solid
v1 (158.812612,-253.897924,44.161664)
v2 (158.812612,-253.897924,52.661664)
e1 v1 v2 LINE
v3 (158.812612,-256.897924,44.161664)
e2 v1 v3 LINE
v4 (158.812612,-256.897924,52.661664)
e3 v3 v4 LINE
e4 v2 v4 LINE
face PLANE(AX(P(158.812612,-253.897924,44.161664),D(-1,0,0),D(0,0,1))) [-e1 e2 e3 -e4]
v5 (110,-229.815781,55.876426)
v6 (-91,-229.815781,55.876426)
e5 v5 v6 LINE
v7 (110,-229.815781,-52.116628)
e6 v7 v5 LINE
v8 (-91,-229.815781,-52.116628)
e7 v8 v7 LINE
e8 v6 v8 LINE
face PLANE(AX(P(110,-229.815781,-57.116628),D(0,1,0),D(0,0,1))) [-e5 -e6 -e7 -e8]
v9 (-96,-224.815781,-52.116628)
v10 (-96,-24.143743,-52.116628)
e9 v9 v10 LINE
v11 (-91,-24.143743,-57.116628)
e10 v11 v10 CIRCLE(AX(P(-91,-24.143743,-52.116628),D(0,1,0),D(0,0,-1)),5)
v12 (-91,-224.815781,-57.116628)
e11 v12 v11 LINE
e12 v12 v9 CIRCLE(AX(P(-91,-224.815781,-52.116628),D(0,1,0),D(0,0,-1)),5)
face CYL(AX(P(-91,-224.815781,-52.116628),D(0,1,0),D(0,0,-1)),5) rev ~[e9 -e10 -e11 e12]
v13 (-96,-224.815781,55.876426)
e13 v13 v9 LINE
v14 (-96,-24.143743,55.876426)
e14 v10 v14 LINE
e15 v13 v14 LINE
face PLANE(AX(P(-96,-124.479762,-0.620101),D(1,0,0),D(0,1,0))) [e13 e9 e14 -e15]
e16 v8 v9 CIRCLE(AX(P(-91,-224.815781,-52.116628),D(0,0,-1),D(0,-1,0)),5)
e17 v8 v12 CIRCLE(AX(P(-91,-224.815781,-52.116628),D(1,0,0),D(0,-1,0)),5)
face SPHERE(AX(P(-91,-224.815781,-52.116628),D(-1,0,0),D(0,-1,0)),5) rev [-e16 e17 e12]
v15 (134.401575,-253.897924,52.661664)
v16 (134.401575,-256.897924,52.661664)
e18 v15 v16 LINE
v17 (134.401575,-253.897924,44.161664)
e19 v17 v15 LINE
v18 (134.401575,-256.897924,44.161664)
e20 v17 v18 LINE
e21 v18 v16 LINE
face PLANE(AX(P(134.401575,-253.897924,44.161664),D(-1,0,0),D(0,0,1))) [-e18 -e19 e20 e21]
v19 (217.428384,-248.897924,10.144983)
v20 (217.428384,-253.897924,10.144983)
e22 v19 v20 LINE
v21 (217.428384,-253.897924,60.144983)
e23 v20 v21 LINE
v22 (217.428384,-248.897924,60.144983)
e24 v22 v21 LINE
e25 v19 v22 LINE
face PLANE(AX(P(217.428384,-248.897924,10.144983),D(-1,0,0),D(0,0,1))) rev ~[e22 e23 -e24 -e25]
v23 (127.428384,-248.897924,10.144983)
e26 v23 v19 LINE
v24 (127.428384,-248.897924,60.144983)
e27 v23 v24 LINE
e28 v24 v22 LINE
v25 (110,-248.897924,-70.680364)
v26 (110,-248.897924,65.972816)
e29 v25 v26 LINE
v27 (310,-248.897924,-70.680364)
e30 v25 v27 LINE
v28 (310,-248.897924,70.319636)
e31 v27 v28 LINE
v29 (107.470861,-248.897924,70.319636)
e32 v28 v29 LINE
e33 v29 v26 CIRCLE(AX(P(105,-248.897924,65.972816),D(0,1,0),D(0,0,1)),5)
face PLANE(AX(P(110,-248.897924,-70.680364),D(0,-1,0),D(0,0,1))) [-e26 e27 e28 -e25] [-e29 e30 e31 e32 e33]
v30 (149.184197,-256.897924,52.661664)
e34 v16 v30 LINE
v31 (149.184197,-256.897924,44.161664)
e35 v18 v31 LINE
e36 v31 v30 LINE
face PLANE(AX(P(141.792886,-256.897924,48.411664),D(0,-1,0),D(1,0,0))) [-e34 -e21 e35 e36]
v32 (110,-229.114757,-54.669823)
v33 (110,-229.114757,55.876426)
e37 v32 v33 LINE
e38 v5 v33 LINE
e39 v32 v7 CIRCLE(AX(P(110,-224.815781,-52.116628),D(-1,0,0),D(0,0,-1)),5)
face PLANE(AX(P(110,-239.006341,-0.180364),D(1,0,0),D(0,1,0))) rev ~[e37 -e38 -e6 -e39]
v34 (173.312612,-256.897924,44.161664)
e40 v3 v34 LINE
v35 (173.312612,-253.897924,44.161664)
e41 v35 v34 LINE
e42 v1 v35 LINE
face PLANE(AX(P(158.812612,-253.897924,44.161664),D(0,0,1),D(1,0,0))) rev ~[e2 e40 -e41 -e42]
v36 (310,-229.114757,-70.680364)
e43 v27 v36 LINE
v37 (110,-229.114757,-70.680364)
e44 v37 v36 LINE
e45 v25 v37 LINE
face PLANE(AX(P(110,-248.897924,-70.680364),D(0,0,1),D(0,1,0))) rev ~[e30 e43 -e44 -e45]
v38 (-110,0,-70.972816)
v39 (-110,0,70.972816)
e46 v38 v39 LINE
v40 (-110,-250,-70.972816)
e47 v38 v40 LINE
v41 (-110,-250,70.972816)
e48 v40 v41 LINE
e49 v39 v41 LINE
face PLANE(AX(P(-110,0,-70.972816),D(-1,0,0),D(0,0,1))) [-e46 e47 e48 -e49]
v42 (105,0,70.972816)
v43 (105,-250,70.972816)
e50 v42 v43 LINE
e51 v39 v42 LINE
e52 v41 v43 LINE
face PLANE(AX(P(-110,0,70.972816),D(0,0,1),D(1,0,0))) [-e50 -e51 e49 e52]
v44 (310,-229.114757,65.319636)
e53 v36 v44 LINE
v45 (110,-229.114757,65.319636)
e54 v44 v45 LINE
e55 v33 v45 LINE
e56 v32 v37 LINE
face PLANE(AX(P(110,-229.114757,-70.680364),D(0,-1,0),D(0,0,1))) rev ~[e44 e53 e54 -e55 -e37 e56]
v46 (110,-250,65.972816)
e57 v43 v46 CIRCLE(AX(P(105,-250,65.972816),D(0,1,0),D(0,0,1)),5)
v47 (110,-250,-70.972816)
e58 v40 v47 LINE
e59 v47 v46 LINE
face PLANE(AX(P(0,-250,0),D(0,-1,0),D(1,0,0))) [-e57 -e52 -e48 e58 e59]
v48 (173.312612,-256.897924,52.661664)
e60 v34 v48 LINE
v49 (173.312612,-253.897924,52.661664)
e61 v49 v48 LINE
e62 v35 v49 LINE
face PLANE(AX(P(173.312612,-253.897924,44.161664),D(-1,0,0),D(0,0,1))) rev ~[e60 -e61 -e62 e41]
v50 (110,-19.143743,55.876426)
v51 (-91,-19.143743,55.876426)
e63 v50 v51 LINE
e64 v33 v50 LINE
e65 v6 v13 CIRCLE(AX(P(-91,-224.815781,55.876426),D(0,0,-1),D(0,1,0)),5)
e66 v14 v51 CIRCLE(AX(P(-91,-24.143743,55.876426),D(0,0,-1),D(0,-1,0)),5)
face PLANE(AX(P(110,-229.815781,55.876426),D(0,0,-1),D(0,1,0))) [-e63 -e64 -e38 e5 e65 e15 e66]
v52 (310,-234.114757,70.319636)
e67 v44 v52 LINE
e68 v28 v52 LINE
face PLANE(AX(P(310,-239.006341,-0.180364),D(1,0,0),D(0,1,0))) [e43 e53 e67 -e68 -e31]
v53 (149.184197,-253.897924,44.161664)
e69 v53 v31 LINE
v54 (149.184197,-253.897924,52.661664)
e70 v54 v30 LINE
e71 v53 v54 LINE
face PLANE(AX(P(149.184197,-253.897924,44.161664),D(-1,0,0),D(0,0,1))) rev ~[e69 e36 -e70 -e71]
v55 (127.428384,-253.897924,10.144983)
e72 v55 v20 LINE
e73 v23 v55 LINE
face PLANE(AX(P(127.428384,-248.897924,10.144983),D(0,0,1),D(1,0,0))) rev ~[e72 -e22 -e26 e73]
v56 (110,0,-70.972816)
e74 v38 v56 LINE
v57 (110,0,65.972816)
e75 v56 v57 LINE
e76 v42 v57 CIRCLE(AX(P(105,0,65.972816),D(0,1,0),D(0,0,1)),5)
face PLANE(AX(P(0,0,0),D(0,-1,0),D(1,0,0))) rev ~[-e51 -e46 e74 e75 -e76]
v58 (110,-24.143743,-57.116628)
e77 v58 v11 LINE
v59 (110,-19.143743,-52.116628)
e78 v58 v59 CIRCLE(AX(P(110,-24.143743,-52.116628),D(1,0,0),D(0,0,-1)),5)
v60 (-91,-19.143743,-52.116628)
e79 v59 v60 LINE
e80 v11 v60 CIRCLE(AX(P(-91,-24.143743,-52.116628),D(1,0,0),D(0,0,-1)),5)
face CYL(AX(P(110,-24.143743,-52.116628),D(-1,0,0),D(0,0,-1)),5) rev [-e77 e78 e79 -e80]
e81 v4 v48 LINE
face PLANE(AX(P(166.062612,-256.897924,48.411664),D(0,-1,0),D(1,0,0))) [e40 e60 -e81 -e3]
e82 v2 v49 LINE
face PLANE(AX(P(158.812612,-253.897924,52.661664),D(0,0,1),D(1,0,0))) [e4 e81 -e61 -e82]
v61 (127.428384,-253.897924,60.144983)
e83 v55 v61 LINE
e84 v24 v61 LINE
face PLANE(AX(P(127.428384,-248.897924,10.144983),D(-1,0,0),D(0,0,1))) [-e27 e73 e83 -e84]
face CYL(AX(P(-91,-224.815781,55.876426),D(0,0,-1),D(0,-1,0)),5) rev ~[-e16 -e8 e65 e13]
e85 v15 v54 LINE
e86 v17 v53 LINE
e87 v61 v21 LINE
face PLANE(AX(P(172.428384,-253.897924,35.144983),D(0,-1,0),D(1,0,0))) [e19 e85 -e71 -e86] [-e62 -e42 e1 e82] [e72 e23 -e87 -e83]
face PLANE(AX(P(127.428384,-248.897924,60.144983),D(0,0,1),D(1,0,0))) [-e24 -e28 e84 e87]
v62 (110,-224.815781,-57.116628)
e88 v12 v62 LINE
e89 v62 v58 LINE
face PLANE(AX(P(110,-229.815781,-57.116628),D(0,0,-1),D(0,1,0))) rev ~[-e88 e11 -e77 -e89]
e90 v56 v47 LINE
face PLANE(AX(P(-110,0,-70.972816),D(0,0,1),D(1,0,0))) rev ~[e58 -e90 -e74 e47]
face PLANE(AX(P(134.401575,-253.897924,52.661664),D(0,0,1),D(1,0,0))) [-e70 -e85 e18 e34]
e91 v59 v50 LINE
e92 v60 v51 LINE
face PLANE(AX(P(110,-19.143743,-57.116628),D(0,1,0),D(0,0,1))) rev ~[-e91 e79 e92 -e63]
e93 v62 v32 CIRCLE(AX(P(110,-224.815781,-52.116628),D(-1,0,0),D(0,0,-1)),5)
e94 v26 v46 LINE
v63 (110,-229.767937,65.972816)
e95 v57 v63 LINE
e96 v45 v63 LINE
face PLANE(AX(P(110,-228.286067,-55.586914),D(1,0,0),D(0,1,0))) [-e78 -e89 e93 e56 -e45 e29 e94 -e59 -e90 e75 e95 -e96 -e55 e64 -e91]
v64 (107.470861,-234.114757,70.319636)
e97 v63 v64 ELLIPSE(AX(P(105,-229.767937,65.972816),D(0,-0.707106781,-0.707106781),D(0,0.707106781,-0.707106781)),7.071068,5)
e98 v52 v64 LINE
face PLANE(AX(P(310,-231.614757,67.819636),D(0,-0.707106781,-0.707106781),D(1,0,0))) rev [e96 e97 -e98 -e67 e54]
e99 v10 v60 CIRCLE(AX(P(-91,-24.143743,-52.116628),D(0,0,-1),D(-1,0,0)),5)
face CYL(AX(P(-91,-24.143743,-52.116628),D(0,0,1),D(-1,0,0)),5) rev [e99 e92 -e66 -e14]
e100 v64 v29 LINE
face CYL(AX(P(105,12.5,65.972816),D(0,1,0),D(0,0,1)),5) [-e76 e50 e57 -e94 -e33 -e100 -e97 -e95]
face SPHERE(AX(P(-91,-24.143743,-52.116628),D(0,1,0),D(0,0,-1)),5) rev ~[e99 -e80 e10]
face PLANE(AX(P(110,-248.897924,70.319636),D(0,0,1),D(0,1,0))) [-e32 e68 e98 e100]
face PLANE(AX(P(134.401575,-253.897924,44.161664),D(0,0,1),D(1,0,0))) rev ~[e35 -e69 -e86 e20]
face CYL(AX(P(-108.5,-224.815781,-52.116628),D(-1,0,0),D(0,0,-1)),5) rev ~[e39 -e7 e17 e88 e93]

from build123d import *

# Parameters (mm, degrees)
F0_W         = 220
F0_H         = 141.9456327772
F1_DEPTH     = 250
F3_W         = 210.672037676
F3_H         = 112.9930540919
F4_DEPTH     = 206
F5_W         = 19.7831674727
F5_H         = 141
F6_DEPTH     = 200
F7_T4_DEPTH  = 275
F7_T10_DEPTH = 275
F7_T16_DEPTH = 275
F7_T23_DEPTH = 275
F7_T29_DEPTH = 275
F8_SIZE      = 5
F9_T1_DEPTH  = 218.5
F10_R        = 5
F11_R        = 5
F12_W        = 90
F12_H        = 50
F13_DEPTH    = 5
F14_W        = 14.7826219899
F14_H        = 8.5
F15_DEPTH    = 3
F16_W        = 14.5
F16_H        = 8.5
F17_DEPTH    = 3


# Not quite as in the source:
# - a fillet or chamfer that OpenCascade refuses, or shapes differently, is made with other operations: its cross-section is extruded or revolved along the edge and cut away or added


with BuildPart() as f1:
    # F0 (on Front) → F1 (new body)
    with BuildSketch(Plane.XZ):
        Rectangle(F0_W, F0_H)
    extrude(amount=F1_DEPTH)

    # F3 (on face) → F4 (cut)
    with BuildSketch(Plane.YZ.offset(110)):
        with Locations((-124.4797622785, -0.6201006472)):
            Rectangle(F3_W, F3_H)
    extrude(amount=-F4_DEPTH, mode=Mode.SUBTRACT)

    # F5 (on face) → F6 (join)
    with BuildSketch(Plane.YZ.offset(110)):
        with Locations((-239.0063405037, -0.1803636551)):
            Rectangle(F5_W, F5_H)
    extrude(amount=F6_DEPTH)

    # F7: fillet of radius 5 on 1 edges, made by hand


with BuildPart() as f7_tool2:
    # F7_s3 → F7_t4 (new body)
    with BuildSketch(Plane.XZ.offset(-12.5)):
        with BuildLine():
            ThreePointArc((105, 70.9728163886), (108.5355339059, 69.5083502945), (110, 65.9728163886))
            Line((110, 65.9728163886), (110, 70.9728163886))
            Line((110, 70.9728163886), (105, 70.9728163886))
        make_face()
    extrude(amount=F7_T4_DEPTH)

    split(bisect_by=Plane.XY.offset(70.3196363449), keep=Keep.TOP)

    split(bisect_by=Plane.XZ.offset(229.1147567674), keep=Keep.BOTTOM)


with BuildPart() as f1_1:
    add(f1.part)

    # F7_t1: cut F7_tool2
    add(f7_tool2.part, mode=Mode.SUBTRACT)


with BuildPart() as f7_tool8:
    # F7_s9 → F7_t10 (new body)
    with BuildSketch(Plane.XZ.offset(-12.5)):
        with BuildLine():
            ThreePointArc((105, 70.9728163886), (108.5355339059, 69.5083502945), (110, 65.9728163886))
            Line((110, 65.9728163886), (110, 70.9728163886))
            Line((110, 70.9728163886), (105, 70.9728163886))
        make_face()
    extrude(amount=F7_T10_DEPTH)

    split(bisect_by=Plane.XY.offset(70.3196363449), keep=Keep.BOTTOM)

    split(bisect_by=Plane.XZ.offset(229.1147567674), keep=Keep.BOTTOM)


with BuildPart() as f1_2:
    add(f1_1.part)

    # F7_t7: cut F7_tool8
    add(f7_tool8.part, mode=Mode.SUBTRACT)


with BuildPart() as f7_tool14:
    # F7_s15 → F7_t16 (new body)
    with BuildSketch(Plane.XZ.offset(-12.5)):
        with BuildLine():
            ThreePointArc((105, 70.9728163886), (108.5355339059, 69.5083502945), (110, 65.9728163886))
            Line((110, 65.9728163886), (110, 70.9728163886))
            Line((110, 70.9728163886), (105, 70.9728163886))
        make_face()
    extrude(amount=F7_T16_DEPTH)

    split(bisect_by=Plane.XZ.offset(248.89792424), keep=Keep.BOTTOM)

    split(bisect_by=Plane.XY.offset(70.3196363449), keep=Keep.TOP)

    split(bisect_by=Plane.XZ.offset(229.1147567674), keep=Keep.TOP)


with BuildPart() as f1_3:
    add(f1_2.part)

    # F7_t13: cut F7_tool14
    add(f7_tool14.part, mode=Mode.SUBTRACT)


with BuildPart() as f7_tool21:
    # F7_s22 → F7_t23 (new body)
    with BuildSketch(Plane.XZ.offset(-12.5)):
        with BuildLine():
            ThreePointArc((105, 70.9728163886), (108.5355339059, 69.5083502945), (110, 65.9728163886))
            Line((110, 65.9728163886), (110, 70.9728163886))
            Line((110, 70.9728163886), (105, 70.9728163886))
        make_face()
    extrude(amount=F7_T23_DEPTH)

    split(bisect_by=Plane.XZ.offset(248.89792424), keep=Keep.TOP)

    split(bisect_by=Plane.XY.offset(70.3196363449), keep=Keep.TOP)


with BuildPart() as f1_4:
    add(f1_3.part)

    # F7_t20: cut F7_tool21
    add(f7_tool21.part, mode=Mode.SUBTRACT)


with BuildPart() as f7_tool27:
    # F7_s28 → F7_t29 (new body)
    with BuildSketch(Plane.XZ.offset(-12.5)):
        with BuildLine():
            ThreePointArc((105, 70.9728163886), (108.5355339059, 69.5083502945), (110, 65.9728163886))
            Line((110, 65.9728163886), (110, 70.9728163886))
            Line((110, 70.9728163886), (105, 70.9728163886))
        make_face()
    extrude(amount=F7_T29_DEPTH)

    split(bisect_by=Plane.XZ.offset(248.89792424), keep=Keep.TOP)

    split(bisect_by=Plane.XY.offset(70.3196363449), keep=Keep.BOTTOM)


with BuildPart() as f1_5:
    add(f1_4.part)

    # F7_t26: cut F7_tool27
    add(f7_tool27.part, mode=Mode.SUBTRACT)

    # F8
    f8_edges = [f1_5.edges().sort_by_distance(p)[0] for p in [
        (208.735431, -229.114757, 70.319636),
    ]]
    chamfer(f8_edges, length=F8_SIZE)

    # F9: fillet of radius 5 on 1 edges, made by hand

    # F9_s2 → F9_t1 (join)
    with BuildSketch(Plane.YZ.offset(-108.5)):
        with BuildLine():
            ThreePointArc((-224.8157811165, -57.1166276932), (-228.3513150224, -55.6521615991), (-229.8157811165, -52.1166276932))
            Line((-229.8157811165, -52.1166276932), (-229.8157811165, -57.1166276932))
            Line((-229.8157811165, -57.1166276932), (-224.8157811165, -57.1166276932))
        make_face()
    extrude(amount=F9_T1_DEPTH)

    # F10
    f10_edges = [f1_5.edges().sort_by_distance(p)[0] for p in [
        (-96, -121.979762, -57.116628),
    ]]
    fillet(f10_edges, radius=F10_R)

    # F11
    f11_edges = [f1_5.edges().sort_by_distance(p)[0] for p in [
        (9.5, -19.143743, -57.116628),
    ]]
    fillet(f11_edges, radius=F11_R)

    # F12 (on face) → F13 (join)
    with BuildSketch(Plane.XZ.offset(248.89792424)):
        with Locations((172.4283844233, 35.1449831093)):
            Rectangle(F12_W, F12_H)
    extrude(amount=F13_DEPTH)

    # F14 (on face) → F15 (join)
    with BuildSketch(Plane.XZ.offset(253.89792424)):
        with Locations((141.7928859591, 48.4116636217)):
            Rectangle(F14_W, F14_H)
    extrude(amount=F15_DEPTH)

    # F16 (on face) → F17 (join)
    with BuildSketch(Plane.XZ.offset(253.89792424)):
        with Locations((166.0626122952, 48.4116636217)):
            Rectangle(F16_W, F16_H)
    extrude(amount=F17_DEPTH)


solid = f1_5.part
